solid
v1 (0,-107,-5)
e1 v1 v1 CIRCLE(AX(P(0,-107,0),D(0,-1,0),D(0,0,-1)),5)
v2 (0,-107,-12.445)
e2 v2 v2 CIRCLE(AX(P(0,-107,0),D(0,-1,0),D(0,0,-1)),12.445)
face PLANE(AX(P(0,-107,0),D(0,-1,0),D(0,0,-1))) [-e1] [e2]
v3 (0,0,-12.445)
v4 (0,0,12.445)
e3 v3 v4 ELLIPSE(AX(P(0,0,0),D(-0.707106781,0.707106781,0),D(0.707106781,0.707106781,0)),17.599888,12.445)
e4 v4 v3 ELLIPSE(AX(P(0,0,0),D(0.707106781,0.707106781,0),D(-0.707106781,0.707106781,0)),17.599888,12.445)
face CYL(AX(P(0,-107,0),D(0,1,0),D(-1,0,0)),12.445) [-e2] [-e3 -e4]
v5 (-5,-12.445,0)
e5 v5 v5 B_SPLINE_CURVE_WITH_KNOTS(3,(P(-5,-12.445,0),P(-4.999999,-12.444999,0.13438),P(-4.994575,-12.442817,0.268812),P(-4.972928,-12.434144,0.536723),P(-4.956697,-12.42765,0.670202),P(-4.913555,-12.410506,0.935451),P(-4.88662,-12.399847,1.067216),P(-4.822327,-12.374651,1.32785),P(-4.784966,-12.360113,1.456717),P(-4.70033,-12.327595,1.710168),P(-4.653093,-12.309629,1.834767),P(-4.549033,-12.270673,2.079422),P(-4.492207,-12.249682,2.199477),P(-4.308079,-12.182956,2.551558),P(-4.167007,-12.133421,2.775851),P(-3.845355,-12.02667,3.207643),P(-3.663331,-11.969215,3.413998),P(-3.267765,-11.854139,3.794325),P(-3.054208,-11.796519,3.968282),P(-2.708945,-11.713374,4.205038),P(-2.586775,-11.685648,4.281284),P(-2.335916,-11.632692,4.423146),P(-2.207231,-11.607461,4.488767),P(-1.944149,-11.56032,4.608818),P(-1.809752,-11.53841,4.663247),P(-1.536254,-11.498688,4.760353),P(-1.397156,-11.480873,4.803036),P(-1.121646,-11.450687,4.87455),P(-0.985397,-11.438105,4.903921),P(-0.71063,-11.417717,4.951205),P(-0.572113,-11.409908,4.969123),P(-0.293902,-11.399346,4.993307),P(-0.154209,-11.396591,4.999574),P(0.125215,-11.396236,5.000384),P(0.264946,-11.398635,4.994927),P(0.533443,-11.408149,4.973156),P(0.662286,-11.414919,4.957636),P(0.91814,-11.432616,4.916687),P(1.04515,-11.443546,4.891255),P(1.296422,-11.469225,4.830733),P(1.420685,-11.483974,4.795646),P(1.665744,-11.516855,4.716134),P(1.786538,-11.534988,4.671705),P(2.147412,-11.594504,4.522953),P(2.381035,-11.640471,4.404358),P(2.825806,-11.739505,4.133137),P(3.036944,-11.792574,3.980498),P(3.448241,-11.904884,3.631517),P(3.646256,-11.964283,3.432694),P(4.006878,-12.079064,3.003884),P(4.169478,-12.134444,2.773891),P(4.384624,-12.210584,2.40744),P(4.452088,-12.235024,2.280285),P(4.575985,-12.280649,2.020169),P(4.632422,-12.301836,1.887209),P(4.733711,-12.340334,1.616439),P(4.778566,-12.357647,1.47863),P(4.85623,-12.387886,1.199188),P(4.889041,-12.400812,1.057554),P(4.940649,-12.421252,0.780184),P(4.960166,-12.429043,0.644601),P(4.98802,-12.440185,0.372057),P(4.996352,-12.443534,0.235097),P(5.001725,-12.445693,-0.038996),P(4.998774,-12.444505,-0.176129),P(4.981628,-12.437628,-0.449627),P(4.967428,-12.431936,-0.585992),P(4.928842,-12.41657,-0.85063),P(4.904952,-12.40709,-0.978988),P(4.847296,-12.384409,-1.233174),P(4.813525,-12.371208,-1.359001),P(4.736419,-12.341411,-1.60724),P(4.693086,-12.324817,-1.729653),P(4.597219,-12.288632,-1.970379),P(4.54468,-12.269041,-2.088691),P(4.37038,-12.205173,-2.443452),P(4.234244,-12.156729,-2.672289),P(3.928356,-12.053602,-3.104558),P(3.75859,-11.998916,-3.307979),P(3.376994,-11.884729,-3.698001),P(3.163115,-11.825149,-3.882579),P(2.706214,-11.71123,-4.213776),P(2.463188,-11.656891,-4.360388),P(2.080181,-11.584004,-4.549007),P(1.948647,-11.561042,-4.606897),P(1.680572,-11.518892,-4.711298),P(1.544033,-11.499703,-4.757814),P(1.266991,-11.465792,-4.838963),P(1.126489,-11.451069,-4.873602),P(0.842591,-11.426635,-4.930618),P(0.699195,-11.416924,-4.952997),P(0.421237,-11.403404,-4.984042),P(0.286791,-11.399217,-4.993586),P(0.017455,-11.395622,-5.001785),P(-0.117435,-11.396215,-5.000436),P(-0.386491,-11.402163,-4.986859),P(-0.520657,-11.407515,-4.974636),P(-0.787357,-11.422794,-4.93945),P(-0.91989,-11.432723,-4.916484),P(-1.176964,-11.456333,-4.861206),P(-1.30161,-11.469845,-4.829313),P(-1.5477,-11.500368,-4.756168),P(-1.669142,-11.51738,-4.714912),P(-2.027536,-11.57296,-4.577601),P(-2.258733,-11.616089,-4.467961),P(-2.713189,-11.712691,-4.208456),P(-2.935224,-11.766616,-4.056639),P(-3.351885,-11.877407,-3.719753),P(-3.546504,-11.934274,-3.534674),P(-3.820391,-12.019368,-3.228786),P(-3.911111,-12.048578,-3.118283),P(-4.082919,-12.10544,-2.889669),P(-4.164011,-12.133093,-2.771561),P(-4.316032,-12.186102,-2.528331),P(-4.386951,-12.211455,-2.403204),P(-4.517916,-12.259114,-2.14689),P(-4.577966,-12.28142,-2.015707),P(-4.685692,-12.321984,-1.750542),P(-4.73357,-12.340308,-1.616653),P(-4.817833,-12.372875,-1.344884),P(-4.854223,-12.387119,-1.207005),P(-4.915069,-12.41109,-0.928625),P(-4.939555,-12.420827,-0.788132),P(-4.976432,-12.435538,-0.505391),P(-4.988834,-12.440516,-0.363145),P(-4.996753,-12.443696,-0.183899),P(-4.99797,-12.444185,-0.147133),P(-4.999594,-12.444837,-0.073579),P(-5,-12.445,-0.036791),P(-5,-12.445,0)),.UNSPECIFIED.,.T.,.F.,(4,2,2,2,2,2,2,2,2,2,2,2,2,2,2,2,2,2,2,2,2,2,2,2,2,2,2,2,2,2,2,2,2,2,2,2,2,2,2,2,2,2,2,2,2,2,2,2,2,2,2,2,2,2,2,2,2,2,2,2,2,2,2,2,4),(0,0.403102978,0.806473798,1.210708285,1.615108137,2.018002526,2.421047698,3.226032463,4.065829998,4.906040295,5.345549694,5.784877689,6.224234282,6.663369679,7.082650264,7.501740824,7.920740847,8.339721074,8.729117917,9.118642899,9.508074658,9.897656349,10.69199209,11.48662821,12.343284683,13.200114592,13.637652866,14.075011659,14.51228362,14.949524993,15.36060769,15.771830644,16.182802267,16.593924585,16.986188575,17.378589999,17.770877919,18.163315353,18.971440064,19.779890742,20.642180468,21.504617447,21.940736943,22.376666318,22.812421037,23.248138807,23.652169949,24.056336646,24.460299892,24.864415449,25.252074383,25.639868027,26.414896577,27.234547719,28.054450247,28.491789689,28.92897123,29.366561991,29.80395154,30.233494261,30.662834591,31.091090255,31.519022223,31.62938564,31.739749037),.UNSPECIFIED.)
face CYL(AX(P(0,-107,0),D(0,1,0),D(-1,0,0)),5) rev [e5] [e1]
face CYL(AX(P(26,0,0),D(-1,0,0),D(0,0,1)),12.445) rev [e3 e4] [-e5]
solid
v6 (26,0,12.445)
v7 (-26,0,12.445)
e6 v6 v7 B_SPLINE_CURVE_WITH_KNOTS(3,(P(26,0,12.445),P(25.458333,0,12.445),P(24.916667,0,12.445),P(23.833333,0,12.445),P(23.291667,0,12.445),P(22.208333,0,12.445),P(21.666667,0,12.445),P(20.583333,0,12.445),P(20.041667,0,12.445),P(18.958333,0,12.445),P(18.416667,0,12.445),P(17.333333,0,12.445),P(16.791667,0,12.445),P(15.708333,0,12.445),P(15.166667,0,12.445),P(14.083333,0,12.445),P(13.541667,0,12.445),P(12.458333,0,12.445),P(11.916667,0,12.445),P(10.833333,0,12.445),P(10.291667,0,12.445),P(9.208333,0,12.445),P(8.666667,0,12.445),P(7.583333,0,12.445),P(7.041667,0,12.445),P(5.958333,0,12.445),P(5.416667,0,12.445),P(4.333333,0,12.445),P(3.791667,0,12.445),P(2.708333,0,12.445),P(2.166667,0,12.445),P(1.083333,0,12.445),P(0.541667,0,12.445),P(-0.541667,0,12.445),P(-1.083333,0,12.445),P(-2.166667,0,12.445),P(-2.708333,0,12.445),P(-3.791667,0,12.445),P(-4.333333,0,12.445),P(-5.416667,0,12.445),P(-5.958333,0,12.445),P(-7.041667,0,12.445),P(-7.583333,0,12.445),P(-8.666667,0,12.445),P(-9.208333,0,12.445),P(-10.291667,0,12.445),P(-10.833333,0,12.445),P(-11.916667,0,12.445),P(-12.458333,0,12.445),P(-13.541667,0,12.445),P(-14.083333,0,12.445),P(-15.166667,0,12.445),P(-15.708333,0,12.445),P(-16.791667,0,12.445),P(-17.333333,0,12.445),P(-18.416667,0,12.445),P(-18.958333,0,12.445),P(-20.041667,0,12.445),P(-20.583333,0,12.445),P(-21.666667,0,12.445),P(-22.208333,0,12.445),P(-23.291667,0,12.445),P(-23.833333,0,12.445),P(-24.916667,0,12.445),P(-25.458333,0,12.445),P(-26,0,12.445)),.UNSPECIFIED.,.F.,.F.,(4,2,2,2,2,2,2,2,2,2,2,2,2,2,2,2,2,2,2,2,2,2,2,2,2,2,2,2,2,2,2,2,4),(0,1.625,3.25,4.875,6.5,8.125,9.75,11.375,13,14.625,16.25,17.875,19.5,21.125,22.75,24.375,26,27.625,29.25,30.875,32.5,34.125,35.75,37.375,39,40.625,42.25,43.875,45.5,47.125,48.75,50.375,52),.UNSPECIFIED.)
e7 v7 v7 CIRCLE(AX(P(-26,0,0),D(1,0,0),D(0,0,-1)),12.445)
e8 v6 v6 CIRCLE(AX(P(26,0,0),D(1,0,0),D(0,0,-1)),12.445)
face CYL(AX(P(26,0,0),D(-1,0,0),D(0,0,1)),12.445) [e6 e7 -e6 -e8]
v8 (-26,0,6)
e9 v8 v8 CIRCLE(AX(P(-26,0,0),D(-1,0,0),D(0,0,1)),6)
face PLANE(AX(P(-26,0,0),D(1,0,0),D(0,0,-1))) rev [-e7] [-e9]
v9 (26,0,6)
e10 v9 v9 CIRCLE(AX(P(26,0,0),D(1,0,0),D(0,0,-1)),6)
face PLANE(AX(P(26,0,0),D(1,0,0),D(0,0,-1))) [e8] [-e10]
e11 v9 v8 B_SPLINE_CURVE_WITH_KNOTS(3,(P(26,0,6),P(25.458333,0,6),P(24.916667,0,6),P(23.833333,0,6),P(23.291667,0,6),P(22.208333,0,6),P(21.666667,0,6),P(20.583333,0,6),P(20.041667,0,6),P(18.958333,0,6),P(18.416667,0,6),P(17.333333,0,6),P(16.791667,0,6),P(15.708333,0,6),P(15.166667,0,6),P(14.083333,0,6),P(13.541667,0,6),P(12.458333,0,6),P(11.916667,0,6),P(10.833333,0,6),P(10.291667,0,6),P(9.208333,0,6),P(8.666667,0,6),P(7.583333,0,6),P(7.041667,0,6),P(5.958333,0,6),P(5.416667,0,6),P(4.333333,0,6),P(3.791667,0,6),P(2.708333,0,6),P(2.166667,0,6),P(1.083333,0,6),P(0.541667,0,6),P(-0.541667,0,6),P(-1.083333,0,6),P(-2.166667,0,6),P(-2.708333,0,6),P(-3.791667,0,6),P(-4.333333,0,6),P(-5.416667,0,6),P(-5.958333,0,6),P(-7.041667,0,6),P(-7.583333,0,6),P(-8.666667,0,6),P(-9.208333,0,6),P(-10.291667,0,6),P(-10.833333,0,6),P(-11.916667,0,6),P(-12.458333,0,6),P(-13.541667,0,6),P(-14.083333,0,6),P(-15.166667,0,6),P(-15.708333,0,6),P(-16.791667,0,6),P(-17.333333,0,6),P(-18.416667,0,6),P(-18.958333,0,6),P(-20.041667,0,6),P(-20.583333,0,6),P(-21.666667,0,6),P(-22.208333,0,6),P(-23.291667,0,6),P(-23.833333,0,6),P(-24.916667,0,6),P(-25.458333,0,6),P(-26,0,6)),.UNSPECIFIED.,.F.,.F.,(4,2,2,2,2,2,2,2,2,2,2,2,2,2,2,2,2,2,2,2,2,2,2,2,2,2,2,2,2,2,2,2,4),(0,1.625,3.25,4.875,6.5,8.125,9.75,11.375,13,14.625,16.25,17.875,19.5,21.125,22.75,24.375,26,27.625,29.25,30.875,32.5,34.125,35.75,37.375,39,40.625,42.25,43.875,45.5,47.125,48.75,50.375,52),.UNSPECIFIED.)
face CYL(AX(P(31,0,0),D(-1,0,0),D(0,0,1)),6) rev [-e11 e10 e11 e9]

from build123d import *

# Parameters (mm, degrees)
PIPE_START                      = -107
PIPE_26_9_X_3_2_1_OUTLINE_R     = 12.445
PIPE_26_9_X_3_2_1_OUTLINE_R_2   = 5
PIPE_26_9_X_3_2_1_DEPTH         = 94.5549999
PIPE_START_2                    = -12.4450001
PIPE_26_9_X_3_2_1_2_OUTLINE_R   = 12.445
PIPE_26_9_X_3_2_1_2_OUTLINE_R_2 = 5
PIPE_26_9_X_3_2_1_2_DEPTH       = 12.4450002
PIPE_START_3                    = -13
PIPE_26_9_X_3_2_1_3_DEPTH       = 26
PIPE_START_4                    = -26
PIPE_26_9_X_3_2_1_4_OUTLINE_R   = 12.445
PIPE_26_9_X_3_2_1_4_OUTLINE_R_2 = 5
PIPE_26_9_X_3_2_1_4_DEPTH       = 52
SKETCH13_R                      = 6
CUT_EXTRUDE1_DEPTH              = 57


with BuildPart() as part:
    # Pipe 26.9 X 3.2(1): read off the stored shape, not the designer's step
    # Pipe 26.9 X 3.2(1) outline → Pipe 26.9 X 3.2(1) (new body)
    with BuildSketch(Plane(origin=(0, 0, 0), x_dir=(1, 0, 0), z_dir=(0, 1, 0)).offset(PIPE_START)):
        Circle(PIPE_26_9_X_3_2_1_OUTLINE_R)
        Circle(PIPE_26_9_X_3_2_1_OUTLINE_R_2, mode=Mode.SUBTRACT)
    extrude(amount=PIPE_26_9_X_3_2_1_DEPTH)

    # Pipe 26.9 X 3.2_1 2 outline → Pipe 26.9 X 3.2_1 2 (add)
    with BuildSketch(Plane(origin=(0, 0, 0), x_dir=(1, 0, 0), z_dir=(0, 1, 0)).offset(PIPE_START_2)):
        Circle(PIPE_26_9_X_3_2_1_2_OUTLINE_R)
        Circle(PIPE_26_9_X_3_2_1_2_OUTLINE_R_2, mode=Mode.SUBTRACT)
    extrude(amount=PIPE_26_9_X_3_2_1_2_DEPTH)

    # Pipe 26.9 X 3.2_1 3 outline → Pipe 26.9 X 3.2_1 3 (cut)
    with BuildSketch(Plane.YZ.offset(PIPE_START_3)):
        with BuildLine():
            ThreePointArc((0, 12.445), (-12.445, 0), (0, -12.445))
            Line((0, -12.445), (0, 12.445))
        make_face()
    extrude(amount=PIPE_26_9_X_3_2_1_3_DEPTH, mode=Mode.SUBTRACT)


with BuildPart() as body_2:
    # Pipe 26.9 X 3.2_1 4 outline → Pipe 26.9 X 3.2_1 4 (new body)
    with BuildSketch(Plane.YZ.offset(PIPE_START_4)):
        Circle(PIPE_26_9_X_3_2_1_4_OUTLINE_R)
        Circle(PIPE_26_9_X_3_2_1_4_OUTLINE_R_2, mode=Mode.SUBTRACT)
    extrude(amount=PIPE_26_9_X_3_2_1_4_DEPTH)

    # Sketch13 → Cut-Extrude1 (cut)
    with BuildSketch(Plane.ZY.offset(26)):
        Circle(SKETCH13_R)
    extrude(amount=-CUT_EXTRUDE1_DEPTH, mode=Mode.SUBTRACT)


solid = Compound([part.part, body_2.part])
